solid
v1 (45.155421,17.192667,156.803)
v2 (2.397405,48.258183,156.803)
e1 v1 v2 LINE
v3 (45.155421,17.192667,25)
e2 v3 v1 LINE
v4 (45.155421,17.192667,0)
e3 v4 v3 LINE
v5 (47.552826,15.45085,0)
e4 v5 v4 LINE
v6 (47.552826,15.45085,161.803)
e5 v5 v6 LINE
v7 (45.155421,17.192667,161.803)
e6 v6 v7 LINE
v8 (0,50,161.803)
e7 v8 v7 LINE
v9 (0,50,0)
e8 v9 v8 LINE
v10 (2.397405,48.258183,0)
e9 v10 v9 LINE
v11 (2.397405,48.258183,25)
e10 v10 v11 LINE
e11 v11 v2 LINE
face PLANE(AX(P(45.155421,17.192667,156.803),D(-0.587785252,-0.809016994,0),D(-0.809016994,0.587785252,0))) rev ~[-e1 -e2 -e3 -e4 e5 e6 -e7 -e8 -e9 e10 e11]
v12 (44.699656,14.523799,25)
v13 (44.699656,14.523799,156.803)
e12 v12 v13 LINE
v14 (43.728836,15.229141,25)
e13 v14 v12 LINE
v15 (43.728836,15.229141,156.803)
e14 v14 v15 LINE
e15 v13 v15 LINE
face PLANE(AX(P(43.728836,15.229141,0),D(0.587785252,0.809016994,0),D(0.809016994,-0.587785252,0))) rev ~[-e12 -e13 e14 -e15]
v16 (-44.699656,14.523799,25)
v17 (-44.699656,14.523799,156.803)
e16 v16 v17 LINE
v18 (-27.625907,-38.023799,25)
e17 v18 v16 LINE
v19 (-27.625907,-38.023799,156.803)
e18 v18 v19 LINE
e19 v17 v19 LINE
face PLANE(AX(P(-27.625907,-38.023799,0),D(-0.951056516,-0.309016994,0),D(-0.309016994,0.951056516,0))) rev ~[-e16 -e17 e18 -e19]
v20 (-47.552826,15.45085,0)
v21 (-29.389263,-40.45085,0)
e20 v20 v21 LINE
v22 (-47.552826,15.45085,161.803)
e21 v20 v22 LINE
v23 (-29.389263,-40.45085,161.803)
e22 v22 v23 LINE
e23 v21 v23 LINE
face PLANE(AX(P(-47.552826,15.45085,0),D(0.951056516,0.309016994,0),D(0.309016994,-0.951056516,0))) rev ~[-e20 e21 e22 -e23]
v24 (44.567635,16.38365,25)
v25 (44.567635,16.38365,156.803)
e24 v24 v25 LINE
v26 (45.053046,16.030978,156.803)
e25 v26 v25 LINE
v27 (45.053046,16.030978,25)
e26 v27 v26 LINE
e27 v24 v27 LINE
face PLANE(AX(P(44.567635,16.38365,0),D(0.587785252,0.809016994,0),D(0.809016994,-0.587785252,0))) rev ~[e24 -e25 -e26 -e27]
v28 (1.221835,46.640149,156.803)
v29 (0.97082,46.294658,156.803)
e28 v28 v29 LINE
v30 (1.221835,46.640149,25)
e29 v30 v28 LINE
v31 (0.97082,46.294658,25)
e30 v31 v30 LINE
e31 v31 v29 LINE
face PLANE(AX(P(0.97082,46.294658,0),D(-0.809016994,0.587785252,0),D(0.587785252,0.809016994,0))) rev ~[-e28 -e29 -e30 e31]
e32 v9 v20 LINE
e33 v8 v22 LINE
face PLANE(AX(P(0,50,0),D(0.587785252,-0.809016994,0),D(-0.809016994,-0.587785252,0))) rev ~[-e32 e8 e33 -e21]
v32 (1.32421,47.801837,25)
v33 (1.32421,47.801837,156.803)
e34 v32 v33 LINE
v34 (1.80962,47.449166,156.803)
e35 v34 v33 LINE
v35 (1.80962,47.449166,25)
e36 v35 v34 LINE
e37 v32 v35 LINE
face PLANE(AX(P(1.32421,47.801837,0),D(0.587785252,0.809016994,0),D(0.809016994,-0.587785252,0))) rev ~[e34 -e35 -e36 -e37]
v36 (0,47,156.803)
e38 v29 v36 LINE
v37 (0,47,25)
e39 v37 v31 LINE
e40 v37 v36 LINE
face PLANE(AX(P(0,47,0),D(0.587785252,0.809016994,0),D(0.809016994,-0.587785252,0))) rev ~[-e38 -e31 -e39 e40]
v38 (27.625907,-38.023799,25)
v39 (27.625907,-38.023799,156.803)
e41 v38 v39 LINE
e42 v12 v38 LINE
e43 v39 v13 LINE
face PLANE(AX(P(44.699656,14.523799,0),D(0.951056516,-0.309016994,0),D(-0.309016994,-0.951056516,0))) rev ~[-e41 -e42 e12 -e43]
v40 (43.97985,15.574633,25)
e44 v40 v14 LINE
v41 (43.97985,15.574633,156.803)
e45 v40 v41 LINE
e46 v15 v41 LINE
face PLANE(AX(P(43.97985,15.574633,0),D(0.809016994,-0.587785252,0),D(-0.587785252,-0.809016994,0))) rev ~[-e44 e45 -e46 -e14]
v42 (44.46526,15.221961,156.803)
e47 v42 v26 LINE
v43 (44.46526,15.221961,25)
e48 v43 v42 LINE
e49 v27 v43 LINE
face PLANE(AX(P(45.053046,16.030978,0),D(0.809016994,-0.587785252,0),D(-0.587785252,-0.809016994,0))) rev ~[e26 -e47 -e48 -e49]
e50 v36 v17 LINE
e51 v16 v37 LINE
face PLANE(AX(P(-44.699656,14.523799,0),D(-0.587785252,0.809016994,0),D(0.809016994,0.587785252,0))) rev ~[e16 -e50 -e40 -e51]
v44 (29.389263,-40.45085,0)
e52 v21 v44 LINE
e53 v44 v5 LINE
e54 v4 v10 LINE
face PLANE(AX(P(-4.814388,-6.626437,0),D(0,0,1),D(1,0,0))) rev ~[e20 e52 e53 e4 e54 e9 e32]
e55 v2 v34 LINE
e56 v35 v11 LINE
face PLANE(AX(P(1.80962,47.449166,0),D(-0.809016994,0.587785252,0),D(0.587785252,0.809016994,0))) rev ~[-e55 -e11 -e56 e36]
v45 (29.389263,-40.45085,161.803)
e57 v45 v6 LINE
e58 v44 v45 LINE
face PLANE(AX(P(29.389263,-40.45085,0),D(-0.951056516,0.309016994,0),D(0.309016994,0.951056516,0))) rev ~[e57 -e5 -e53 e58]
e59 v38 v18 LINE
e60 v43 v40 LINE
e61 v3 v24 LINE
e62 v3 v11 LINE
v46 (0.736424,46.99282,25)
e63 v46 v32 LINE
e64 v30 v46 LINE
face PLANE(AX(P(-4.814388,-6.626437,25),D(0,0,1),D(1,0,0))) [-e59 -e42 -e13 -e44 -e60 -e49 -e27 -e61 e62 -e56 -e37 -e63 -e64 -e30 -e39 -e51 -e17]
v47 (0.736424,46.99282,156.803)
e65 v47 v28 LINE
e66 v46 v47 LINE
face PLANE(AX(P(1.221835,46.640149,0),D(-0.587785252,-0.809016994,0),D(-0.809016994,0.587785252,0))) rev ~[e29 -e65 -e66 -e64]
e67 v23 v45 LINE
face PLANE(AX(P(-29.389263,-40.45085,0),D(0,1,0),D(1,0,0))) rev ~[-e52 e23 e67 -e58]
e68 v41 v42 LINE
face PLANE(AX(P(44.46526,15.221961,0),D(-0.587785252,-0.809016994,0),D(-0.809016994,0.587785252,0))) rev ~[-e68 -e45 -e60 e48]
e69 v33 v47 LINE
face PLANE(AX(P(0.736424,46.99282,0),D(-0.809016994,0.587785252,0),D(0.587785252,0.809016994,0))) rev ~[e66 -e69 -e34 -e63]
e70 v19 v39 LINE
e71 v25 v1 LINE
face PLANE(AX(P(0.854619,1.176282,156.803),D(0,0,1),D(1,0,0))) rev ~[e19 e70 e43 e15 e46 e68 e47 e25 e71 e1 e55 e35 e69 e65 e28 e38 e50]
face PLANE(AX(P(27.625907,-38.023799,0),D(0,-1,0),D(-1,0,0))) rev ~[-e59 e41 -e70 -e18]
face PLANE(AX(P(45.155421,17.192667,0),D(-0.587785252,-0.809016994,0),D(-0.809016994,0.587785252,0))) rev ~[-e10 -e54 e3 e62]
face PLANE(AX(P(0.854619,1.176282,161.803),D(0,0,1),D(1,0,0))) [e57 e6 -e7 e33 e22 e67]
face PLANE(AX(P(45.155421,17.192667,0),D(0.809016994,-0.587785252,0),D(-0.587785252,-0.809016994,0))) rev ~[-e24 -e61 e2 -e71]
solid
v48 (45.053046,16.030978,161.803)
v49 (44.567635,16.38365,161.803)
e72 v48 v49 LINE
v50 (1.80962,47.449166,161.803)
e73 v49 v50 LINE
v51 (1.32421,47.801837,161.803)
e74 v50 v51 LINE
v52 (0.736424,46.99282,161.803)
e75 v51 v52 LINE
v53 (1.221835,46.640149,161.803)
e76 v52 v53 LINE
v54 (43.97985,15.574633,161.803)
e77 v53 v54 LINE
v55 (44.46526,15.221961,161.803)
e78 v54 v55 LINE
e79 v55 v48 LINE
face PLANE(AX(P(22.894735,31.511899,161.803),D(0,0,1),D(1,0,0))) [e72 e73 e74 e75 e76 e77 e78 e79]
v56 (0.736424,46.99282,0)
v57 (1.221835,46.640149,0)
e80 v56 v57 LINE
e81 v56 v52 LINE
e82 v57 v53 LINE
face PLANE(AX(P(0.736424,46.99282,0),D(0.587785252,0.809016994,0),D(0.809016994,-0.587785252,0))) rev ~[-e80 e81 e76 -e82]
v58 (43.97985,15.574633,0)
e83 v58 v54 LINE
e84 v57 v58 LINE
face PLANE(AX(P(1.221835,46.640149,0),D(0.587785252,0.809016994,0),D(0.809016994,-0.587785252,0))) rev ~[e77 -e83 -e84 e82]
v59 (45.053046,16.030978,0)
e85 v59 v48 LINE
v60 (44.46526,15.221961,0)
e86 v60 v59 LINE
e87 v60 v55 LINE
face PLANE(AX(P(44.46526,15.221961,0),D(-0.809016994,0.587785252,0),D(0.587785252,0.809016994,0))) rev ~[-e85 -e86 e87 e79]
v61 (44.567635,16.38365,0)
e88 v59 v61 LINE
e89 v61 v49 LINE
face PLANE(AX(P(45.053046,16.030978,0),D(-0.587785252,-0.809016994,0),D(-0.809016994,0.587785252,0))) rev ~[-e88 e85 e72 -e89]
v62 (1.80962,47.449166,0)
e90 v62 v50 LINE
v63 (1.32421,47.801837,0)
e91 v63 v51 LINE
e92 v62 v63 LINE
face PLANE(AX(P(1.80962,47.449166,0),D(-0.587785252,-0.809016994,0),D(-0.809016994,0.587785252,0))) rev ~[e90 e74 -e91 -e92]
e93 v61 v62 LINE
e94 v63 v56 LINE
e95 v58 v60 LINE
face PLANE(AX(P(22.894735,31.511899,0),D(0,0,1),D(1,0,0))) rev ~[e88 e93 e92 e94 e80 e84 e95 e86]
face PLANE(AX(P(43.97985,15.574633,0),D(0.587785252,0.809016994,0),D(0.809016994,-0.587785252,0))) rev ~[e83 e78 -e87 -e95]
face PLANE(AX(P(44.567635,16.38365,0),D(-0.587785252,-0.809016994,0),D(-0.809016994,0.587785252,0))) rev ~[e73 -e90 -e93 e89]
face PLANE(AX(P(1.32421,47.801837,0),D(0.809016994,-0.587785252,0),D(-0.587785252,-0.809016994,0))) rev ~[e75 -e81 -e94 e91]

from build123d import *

# Parameters (mm, degrees)
F4_DEPTH = 161.803
F5_DEPTH = 25
F6_START = 131.803
F6_DEPTH = 5
F7_DEPTH = 161.803


with BuildPart() as f4:
    # F3 (on Top) → F4 (new body)
    with BuildSketch(Plane.XY):
        Polygon((2.3974051677, 48.2581831888), (0, 50), (-47.5528258148, 15.4508497187), (-29.3892626146, -40.4508497187), (29.3892626146, -40.4508497187), (47.5528258148, 15.4508497187), (45.1554206471, 17.1926665299), (44.5676353948, 16.3836495356), (45.0530455914, 16.0309783842), (44.4652603391, 15.2219613898), (43.9798501425, 15.5746325412), (43.7288358726, 15.2291410384), (44.6996562659, 14.5237987356), (27.6259068577, -38.0237987356), (-27.6259068577, -38.0237987356), (-44.6996562659, 14.5237987356), (0, 47), (0.9708203932, 46.2946576972), (1.2218346631, 46.6401492001), (0.7364244665, 46.9928203514), (1.3242097188, 47.8018373458), (1.8096199154, 47.4491661944), align=None)
    extrude(amount=F4_DEPTH)

    # F3 (on Top) → F5 (join)
    with BuildSketch(Plane.XY):
        Polygon((2.3974051677, 48.2581831888), (0, 50), (-47.5528258148, 15.4508497187), (-29.3892626146, -40.4508497187), (29.3892626146, -40.4508497187), (47.5528258148, 15.4508497187), (45.1554206471, 17.1926665299), (44.5676353948, 16.3836495356), (45.0530455914, 16.0309783842), (44.4652603391, 15.2219613898), (43.9798501425, 15.5746325412), (43.7288358726, 15.2291410384), (44.6996562659, 14.5237987356), (27.6259068577, -38.0237987356), (-27.6259068577, -38.0237987356), (-44.6996562659, 14.5237987356), (0, 47), (0.9708203932, 46.2946576972), (1.2218346631, 46.6401492001), (0.7364244665, 46.9928203514), (1.3242097188, 47.8018373458), (1.8096199154, 47.4491661944), align=None)
        Polygon((45.1554206471, 17.1926665299), (2.3974051677, 48.2581831888), (1.8096199154, 47.4491661944), (44.5676353948, 16.3836495356), align=None)
        Polygon((43.7288358726, 15.2291410384), (0.9708203932, 46.2946576972), (0, 47), (-44.6996562659, 14.5237987356), (-27.6259068577, -38.0237987356), (27.6259068577, -38.0237987356), (44.6996562659, 14.5237987356), align=None)
        Polygon((44.5676353948, 16.3836495356), (1.8096199154, 47.4491661944), (1.3242097188, 47.8018373458), (0.7364244665, 46.9928203514), (1.2218346631, 46.6401492001), (43.9798501425, 15.5746325412), (44.4652603391, 15.2219613898), (45.0530455914, 16.0309783842), align=None)
        Polygon((43.9798501425, 15.5746325412), (1.2218346631, 46.6401492001), (0.9708203932, 46.2946576972), (43.7288358726, 15.2291410384), align=None)
    extrude(amount=F5_DEPTH)

    # F5_face (on face) → F6 (join)
    with BuildSketch(Plane(origin=(0.5548214396, 0.7636461986, 25), x_dir=(1, 0, 0), z_dir=(0, 0, 1)).offset(F6_START)):
        Polygon((44.0128139551, 15.6200033369), (44.6005992074, 16.4290203313), (1.8425837281, 47.4945369902), (1.2547984758, 46.6855199958), (0.7693882791, 47.0381911472), (0.1816030268, 46.2291741528), (0.6670132235, 45.8765030014), (0.4159989536, 45.5310114986), (-0.5548214396, 46.2363538014), (-45.2544777055, 13.760152537), (-28.1807282974, -38.7874449342), (27.0710854181, -38.7874449342), (44.1448348262, 13.760152537), (43.174014433, 14.4654948398), (43.4250287028, 14.8109863426), (43.9104388995, 14.4583151912), (44.4982241518, 15.2673321856), align=None)
    extrude(amount=F6_DEPTH)


with BuildPart() as f7:
    # F3 (on Top) → F7 (new body)
    with BuildSketch(Plane.XY):
        Polygon((44.5676353948, 16.3836495356), (1.8096199154, 47.4491661944), (1.3242097188, 47.8018373458), (0.7364244665, 46.9928203514), (1.2218346631, 46.6401492001), (43.9798501425, 15.5746325412), (44.4652603391, 15.2219613898), (45.0530455914, 16.0309783842), align=None)
    extrude(amount=F7_DEPTH)


solid = Compound([f4.part, f7.part])
